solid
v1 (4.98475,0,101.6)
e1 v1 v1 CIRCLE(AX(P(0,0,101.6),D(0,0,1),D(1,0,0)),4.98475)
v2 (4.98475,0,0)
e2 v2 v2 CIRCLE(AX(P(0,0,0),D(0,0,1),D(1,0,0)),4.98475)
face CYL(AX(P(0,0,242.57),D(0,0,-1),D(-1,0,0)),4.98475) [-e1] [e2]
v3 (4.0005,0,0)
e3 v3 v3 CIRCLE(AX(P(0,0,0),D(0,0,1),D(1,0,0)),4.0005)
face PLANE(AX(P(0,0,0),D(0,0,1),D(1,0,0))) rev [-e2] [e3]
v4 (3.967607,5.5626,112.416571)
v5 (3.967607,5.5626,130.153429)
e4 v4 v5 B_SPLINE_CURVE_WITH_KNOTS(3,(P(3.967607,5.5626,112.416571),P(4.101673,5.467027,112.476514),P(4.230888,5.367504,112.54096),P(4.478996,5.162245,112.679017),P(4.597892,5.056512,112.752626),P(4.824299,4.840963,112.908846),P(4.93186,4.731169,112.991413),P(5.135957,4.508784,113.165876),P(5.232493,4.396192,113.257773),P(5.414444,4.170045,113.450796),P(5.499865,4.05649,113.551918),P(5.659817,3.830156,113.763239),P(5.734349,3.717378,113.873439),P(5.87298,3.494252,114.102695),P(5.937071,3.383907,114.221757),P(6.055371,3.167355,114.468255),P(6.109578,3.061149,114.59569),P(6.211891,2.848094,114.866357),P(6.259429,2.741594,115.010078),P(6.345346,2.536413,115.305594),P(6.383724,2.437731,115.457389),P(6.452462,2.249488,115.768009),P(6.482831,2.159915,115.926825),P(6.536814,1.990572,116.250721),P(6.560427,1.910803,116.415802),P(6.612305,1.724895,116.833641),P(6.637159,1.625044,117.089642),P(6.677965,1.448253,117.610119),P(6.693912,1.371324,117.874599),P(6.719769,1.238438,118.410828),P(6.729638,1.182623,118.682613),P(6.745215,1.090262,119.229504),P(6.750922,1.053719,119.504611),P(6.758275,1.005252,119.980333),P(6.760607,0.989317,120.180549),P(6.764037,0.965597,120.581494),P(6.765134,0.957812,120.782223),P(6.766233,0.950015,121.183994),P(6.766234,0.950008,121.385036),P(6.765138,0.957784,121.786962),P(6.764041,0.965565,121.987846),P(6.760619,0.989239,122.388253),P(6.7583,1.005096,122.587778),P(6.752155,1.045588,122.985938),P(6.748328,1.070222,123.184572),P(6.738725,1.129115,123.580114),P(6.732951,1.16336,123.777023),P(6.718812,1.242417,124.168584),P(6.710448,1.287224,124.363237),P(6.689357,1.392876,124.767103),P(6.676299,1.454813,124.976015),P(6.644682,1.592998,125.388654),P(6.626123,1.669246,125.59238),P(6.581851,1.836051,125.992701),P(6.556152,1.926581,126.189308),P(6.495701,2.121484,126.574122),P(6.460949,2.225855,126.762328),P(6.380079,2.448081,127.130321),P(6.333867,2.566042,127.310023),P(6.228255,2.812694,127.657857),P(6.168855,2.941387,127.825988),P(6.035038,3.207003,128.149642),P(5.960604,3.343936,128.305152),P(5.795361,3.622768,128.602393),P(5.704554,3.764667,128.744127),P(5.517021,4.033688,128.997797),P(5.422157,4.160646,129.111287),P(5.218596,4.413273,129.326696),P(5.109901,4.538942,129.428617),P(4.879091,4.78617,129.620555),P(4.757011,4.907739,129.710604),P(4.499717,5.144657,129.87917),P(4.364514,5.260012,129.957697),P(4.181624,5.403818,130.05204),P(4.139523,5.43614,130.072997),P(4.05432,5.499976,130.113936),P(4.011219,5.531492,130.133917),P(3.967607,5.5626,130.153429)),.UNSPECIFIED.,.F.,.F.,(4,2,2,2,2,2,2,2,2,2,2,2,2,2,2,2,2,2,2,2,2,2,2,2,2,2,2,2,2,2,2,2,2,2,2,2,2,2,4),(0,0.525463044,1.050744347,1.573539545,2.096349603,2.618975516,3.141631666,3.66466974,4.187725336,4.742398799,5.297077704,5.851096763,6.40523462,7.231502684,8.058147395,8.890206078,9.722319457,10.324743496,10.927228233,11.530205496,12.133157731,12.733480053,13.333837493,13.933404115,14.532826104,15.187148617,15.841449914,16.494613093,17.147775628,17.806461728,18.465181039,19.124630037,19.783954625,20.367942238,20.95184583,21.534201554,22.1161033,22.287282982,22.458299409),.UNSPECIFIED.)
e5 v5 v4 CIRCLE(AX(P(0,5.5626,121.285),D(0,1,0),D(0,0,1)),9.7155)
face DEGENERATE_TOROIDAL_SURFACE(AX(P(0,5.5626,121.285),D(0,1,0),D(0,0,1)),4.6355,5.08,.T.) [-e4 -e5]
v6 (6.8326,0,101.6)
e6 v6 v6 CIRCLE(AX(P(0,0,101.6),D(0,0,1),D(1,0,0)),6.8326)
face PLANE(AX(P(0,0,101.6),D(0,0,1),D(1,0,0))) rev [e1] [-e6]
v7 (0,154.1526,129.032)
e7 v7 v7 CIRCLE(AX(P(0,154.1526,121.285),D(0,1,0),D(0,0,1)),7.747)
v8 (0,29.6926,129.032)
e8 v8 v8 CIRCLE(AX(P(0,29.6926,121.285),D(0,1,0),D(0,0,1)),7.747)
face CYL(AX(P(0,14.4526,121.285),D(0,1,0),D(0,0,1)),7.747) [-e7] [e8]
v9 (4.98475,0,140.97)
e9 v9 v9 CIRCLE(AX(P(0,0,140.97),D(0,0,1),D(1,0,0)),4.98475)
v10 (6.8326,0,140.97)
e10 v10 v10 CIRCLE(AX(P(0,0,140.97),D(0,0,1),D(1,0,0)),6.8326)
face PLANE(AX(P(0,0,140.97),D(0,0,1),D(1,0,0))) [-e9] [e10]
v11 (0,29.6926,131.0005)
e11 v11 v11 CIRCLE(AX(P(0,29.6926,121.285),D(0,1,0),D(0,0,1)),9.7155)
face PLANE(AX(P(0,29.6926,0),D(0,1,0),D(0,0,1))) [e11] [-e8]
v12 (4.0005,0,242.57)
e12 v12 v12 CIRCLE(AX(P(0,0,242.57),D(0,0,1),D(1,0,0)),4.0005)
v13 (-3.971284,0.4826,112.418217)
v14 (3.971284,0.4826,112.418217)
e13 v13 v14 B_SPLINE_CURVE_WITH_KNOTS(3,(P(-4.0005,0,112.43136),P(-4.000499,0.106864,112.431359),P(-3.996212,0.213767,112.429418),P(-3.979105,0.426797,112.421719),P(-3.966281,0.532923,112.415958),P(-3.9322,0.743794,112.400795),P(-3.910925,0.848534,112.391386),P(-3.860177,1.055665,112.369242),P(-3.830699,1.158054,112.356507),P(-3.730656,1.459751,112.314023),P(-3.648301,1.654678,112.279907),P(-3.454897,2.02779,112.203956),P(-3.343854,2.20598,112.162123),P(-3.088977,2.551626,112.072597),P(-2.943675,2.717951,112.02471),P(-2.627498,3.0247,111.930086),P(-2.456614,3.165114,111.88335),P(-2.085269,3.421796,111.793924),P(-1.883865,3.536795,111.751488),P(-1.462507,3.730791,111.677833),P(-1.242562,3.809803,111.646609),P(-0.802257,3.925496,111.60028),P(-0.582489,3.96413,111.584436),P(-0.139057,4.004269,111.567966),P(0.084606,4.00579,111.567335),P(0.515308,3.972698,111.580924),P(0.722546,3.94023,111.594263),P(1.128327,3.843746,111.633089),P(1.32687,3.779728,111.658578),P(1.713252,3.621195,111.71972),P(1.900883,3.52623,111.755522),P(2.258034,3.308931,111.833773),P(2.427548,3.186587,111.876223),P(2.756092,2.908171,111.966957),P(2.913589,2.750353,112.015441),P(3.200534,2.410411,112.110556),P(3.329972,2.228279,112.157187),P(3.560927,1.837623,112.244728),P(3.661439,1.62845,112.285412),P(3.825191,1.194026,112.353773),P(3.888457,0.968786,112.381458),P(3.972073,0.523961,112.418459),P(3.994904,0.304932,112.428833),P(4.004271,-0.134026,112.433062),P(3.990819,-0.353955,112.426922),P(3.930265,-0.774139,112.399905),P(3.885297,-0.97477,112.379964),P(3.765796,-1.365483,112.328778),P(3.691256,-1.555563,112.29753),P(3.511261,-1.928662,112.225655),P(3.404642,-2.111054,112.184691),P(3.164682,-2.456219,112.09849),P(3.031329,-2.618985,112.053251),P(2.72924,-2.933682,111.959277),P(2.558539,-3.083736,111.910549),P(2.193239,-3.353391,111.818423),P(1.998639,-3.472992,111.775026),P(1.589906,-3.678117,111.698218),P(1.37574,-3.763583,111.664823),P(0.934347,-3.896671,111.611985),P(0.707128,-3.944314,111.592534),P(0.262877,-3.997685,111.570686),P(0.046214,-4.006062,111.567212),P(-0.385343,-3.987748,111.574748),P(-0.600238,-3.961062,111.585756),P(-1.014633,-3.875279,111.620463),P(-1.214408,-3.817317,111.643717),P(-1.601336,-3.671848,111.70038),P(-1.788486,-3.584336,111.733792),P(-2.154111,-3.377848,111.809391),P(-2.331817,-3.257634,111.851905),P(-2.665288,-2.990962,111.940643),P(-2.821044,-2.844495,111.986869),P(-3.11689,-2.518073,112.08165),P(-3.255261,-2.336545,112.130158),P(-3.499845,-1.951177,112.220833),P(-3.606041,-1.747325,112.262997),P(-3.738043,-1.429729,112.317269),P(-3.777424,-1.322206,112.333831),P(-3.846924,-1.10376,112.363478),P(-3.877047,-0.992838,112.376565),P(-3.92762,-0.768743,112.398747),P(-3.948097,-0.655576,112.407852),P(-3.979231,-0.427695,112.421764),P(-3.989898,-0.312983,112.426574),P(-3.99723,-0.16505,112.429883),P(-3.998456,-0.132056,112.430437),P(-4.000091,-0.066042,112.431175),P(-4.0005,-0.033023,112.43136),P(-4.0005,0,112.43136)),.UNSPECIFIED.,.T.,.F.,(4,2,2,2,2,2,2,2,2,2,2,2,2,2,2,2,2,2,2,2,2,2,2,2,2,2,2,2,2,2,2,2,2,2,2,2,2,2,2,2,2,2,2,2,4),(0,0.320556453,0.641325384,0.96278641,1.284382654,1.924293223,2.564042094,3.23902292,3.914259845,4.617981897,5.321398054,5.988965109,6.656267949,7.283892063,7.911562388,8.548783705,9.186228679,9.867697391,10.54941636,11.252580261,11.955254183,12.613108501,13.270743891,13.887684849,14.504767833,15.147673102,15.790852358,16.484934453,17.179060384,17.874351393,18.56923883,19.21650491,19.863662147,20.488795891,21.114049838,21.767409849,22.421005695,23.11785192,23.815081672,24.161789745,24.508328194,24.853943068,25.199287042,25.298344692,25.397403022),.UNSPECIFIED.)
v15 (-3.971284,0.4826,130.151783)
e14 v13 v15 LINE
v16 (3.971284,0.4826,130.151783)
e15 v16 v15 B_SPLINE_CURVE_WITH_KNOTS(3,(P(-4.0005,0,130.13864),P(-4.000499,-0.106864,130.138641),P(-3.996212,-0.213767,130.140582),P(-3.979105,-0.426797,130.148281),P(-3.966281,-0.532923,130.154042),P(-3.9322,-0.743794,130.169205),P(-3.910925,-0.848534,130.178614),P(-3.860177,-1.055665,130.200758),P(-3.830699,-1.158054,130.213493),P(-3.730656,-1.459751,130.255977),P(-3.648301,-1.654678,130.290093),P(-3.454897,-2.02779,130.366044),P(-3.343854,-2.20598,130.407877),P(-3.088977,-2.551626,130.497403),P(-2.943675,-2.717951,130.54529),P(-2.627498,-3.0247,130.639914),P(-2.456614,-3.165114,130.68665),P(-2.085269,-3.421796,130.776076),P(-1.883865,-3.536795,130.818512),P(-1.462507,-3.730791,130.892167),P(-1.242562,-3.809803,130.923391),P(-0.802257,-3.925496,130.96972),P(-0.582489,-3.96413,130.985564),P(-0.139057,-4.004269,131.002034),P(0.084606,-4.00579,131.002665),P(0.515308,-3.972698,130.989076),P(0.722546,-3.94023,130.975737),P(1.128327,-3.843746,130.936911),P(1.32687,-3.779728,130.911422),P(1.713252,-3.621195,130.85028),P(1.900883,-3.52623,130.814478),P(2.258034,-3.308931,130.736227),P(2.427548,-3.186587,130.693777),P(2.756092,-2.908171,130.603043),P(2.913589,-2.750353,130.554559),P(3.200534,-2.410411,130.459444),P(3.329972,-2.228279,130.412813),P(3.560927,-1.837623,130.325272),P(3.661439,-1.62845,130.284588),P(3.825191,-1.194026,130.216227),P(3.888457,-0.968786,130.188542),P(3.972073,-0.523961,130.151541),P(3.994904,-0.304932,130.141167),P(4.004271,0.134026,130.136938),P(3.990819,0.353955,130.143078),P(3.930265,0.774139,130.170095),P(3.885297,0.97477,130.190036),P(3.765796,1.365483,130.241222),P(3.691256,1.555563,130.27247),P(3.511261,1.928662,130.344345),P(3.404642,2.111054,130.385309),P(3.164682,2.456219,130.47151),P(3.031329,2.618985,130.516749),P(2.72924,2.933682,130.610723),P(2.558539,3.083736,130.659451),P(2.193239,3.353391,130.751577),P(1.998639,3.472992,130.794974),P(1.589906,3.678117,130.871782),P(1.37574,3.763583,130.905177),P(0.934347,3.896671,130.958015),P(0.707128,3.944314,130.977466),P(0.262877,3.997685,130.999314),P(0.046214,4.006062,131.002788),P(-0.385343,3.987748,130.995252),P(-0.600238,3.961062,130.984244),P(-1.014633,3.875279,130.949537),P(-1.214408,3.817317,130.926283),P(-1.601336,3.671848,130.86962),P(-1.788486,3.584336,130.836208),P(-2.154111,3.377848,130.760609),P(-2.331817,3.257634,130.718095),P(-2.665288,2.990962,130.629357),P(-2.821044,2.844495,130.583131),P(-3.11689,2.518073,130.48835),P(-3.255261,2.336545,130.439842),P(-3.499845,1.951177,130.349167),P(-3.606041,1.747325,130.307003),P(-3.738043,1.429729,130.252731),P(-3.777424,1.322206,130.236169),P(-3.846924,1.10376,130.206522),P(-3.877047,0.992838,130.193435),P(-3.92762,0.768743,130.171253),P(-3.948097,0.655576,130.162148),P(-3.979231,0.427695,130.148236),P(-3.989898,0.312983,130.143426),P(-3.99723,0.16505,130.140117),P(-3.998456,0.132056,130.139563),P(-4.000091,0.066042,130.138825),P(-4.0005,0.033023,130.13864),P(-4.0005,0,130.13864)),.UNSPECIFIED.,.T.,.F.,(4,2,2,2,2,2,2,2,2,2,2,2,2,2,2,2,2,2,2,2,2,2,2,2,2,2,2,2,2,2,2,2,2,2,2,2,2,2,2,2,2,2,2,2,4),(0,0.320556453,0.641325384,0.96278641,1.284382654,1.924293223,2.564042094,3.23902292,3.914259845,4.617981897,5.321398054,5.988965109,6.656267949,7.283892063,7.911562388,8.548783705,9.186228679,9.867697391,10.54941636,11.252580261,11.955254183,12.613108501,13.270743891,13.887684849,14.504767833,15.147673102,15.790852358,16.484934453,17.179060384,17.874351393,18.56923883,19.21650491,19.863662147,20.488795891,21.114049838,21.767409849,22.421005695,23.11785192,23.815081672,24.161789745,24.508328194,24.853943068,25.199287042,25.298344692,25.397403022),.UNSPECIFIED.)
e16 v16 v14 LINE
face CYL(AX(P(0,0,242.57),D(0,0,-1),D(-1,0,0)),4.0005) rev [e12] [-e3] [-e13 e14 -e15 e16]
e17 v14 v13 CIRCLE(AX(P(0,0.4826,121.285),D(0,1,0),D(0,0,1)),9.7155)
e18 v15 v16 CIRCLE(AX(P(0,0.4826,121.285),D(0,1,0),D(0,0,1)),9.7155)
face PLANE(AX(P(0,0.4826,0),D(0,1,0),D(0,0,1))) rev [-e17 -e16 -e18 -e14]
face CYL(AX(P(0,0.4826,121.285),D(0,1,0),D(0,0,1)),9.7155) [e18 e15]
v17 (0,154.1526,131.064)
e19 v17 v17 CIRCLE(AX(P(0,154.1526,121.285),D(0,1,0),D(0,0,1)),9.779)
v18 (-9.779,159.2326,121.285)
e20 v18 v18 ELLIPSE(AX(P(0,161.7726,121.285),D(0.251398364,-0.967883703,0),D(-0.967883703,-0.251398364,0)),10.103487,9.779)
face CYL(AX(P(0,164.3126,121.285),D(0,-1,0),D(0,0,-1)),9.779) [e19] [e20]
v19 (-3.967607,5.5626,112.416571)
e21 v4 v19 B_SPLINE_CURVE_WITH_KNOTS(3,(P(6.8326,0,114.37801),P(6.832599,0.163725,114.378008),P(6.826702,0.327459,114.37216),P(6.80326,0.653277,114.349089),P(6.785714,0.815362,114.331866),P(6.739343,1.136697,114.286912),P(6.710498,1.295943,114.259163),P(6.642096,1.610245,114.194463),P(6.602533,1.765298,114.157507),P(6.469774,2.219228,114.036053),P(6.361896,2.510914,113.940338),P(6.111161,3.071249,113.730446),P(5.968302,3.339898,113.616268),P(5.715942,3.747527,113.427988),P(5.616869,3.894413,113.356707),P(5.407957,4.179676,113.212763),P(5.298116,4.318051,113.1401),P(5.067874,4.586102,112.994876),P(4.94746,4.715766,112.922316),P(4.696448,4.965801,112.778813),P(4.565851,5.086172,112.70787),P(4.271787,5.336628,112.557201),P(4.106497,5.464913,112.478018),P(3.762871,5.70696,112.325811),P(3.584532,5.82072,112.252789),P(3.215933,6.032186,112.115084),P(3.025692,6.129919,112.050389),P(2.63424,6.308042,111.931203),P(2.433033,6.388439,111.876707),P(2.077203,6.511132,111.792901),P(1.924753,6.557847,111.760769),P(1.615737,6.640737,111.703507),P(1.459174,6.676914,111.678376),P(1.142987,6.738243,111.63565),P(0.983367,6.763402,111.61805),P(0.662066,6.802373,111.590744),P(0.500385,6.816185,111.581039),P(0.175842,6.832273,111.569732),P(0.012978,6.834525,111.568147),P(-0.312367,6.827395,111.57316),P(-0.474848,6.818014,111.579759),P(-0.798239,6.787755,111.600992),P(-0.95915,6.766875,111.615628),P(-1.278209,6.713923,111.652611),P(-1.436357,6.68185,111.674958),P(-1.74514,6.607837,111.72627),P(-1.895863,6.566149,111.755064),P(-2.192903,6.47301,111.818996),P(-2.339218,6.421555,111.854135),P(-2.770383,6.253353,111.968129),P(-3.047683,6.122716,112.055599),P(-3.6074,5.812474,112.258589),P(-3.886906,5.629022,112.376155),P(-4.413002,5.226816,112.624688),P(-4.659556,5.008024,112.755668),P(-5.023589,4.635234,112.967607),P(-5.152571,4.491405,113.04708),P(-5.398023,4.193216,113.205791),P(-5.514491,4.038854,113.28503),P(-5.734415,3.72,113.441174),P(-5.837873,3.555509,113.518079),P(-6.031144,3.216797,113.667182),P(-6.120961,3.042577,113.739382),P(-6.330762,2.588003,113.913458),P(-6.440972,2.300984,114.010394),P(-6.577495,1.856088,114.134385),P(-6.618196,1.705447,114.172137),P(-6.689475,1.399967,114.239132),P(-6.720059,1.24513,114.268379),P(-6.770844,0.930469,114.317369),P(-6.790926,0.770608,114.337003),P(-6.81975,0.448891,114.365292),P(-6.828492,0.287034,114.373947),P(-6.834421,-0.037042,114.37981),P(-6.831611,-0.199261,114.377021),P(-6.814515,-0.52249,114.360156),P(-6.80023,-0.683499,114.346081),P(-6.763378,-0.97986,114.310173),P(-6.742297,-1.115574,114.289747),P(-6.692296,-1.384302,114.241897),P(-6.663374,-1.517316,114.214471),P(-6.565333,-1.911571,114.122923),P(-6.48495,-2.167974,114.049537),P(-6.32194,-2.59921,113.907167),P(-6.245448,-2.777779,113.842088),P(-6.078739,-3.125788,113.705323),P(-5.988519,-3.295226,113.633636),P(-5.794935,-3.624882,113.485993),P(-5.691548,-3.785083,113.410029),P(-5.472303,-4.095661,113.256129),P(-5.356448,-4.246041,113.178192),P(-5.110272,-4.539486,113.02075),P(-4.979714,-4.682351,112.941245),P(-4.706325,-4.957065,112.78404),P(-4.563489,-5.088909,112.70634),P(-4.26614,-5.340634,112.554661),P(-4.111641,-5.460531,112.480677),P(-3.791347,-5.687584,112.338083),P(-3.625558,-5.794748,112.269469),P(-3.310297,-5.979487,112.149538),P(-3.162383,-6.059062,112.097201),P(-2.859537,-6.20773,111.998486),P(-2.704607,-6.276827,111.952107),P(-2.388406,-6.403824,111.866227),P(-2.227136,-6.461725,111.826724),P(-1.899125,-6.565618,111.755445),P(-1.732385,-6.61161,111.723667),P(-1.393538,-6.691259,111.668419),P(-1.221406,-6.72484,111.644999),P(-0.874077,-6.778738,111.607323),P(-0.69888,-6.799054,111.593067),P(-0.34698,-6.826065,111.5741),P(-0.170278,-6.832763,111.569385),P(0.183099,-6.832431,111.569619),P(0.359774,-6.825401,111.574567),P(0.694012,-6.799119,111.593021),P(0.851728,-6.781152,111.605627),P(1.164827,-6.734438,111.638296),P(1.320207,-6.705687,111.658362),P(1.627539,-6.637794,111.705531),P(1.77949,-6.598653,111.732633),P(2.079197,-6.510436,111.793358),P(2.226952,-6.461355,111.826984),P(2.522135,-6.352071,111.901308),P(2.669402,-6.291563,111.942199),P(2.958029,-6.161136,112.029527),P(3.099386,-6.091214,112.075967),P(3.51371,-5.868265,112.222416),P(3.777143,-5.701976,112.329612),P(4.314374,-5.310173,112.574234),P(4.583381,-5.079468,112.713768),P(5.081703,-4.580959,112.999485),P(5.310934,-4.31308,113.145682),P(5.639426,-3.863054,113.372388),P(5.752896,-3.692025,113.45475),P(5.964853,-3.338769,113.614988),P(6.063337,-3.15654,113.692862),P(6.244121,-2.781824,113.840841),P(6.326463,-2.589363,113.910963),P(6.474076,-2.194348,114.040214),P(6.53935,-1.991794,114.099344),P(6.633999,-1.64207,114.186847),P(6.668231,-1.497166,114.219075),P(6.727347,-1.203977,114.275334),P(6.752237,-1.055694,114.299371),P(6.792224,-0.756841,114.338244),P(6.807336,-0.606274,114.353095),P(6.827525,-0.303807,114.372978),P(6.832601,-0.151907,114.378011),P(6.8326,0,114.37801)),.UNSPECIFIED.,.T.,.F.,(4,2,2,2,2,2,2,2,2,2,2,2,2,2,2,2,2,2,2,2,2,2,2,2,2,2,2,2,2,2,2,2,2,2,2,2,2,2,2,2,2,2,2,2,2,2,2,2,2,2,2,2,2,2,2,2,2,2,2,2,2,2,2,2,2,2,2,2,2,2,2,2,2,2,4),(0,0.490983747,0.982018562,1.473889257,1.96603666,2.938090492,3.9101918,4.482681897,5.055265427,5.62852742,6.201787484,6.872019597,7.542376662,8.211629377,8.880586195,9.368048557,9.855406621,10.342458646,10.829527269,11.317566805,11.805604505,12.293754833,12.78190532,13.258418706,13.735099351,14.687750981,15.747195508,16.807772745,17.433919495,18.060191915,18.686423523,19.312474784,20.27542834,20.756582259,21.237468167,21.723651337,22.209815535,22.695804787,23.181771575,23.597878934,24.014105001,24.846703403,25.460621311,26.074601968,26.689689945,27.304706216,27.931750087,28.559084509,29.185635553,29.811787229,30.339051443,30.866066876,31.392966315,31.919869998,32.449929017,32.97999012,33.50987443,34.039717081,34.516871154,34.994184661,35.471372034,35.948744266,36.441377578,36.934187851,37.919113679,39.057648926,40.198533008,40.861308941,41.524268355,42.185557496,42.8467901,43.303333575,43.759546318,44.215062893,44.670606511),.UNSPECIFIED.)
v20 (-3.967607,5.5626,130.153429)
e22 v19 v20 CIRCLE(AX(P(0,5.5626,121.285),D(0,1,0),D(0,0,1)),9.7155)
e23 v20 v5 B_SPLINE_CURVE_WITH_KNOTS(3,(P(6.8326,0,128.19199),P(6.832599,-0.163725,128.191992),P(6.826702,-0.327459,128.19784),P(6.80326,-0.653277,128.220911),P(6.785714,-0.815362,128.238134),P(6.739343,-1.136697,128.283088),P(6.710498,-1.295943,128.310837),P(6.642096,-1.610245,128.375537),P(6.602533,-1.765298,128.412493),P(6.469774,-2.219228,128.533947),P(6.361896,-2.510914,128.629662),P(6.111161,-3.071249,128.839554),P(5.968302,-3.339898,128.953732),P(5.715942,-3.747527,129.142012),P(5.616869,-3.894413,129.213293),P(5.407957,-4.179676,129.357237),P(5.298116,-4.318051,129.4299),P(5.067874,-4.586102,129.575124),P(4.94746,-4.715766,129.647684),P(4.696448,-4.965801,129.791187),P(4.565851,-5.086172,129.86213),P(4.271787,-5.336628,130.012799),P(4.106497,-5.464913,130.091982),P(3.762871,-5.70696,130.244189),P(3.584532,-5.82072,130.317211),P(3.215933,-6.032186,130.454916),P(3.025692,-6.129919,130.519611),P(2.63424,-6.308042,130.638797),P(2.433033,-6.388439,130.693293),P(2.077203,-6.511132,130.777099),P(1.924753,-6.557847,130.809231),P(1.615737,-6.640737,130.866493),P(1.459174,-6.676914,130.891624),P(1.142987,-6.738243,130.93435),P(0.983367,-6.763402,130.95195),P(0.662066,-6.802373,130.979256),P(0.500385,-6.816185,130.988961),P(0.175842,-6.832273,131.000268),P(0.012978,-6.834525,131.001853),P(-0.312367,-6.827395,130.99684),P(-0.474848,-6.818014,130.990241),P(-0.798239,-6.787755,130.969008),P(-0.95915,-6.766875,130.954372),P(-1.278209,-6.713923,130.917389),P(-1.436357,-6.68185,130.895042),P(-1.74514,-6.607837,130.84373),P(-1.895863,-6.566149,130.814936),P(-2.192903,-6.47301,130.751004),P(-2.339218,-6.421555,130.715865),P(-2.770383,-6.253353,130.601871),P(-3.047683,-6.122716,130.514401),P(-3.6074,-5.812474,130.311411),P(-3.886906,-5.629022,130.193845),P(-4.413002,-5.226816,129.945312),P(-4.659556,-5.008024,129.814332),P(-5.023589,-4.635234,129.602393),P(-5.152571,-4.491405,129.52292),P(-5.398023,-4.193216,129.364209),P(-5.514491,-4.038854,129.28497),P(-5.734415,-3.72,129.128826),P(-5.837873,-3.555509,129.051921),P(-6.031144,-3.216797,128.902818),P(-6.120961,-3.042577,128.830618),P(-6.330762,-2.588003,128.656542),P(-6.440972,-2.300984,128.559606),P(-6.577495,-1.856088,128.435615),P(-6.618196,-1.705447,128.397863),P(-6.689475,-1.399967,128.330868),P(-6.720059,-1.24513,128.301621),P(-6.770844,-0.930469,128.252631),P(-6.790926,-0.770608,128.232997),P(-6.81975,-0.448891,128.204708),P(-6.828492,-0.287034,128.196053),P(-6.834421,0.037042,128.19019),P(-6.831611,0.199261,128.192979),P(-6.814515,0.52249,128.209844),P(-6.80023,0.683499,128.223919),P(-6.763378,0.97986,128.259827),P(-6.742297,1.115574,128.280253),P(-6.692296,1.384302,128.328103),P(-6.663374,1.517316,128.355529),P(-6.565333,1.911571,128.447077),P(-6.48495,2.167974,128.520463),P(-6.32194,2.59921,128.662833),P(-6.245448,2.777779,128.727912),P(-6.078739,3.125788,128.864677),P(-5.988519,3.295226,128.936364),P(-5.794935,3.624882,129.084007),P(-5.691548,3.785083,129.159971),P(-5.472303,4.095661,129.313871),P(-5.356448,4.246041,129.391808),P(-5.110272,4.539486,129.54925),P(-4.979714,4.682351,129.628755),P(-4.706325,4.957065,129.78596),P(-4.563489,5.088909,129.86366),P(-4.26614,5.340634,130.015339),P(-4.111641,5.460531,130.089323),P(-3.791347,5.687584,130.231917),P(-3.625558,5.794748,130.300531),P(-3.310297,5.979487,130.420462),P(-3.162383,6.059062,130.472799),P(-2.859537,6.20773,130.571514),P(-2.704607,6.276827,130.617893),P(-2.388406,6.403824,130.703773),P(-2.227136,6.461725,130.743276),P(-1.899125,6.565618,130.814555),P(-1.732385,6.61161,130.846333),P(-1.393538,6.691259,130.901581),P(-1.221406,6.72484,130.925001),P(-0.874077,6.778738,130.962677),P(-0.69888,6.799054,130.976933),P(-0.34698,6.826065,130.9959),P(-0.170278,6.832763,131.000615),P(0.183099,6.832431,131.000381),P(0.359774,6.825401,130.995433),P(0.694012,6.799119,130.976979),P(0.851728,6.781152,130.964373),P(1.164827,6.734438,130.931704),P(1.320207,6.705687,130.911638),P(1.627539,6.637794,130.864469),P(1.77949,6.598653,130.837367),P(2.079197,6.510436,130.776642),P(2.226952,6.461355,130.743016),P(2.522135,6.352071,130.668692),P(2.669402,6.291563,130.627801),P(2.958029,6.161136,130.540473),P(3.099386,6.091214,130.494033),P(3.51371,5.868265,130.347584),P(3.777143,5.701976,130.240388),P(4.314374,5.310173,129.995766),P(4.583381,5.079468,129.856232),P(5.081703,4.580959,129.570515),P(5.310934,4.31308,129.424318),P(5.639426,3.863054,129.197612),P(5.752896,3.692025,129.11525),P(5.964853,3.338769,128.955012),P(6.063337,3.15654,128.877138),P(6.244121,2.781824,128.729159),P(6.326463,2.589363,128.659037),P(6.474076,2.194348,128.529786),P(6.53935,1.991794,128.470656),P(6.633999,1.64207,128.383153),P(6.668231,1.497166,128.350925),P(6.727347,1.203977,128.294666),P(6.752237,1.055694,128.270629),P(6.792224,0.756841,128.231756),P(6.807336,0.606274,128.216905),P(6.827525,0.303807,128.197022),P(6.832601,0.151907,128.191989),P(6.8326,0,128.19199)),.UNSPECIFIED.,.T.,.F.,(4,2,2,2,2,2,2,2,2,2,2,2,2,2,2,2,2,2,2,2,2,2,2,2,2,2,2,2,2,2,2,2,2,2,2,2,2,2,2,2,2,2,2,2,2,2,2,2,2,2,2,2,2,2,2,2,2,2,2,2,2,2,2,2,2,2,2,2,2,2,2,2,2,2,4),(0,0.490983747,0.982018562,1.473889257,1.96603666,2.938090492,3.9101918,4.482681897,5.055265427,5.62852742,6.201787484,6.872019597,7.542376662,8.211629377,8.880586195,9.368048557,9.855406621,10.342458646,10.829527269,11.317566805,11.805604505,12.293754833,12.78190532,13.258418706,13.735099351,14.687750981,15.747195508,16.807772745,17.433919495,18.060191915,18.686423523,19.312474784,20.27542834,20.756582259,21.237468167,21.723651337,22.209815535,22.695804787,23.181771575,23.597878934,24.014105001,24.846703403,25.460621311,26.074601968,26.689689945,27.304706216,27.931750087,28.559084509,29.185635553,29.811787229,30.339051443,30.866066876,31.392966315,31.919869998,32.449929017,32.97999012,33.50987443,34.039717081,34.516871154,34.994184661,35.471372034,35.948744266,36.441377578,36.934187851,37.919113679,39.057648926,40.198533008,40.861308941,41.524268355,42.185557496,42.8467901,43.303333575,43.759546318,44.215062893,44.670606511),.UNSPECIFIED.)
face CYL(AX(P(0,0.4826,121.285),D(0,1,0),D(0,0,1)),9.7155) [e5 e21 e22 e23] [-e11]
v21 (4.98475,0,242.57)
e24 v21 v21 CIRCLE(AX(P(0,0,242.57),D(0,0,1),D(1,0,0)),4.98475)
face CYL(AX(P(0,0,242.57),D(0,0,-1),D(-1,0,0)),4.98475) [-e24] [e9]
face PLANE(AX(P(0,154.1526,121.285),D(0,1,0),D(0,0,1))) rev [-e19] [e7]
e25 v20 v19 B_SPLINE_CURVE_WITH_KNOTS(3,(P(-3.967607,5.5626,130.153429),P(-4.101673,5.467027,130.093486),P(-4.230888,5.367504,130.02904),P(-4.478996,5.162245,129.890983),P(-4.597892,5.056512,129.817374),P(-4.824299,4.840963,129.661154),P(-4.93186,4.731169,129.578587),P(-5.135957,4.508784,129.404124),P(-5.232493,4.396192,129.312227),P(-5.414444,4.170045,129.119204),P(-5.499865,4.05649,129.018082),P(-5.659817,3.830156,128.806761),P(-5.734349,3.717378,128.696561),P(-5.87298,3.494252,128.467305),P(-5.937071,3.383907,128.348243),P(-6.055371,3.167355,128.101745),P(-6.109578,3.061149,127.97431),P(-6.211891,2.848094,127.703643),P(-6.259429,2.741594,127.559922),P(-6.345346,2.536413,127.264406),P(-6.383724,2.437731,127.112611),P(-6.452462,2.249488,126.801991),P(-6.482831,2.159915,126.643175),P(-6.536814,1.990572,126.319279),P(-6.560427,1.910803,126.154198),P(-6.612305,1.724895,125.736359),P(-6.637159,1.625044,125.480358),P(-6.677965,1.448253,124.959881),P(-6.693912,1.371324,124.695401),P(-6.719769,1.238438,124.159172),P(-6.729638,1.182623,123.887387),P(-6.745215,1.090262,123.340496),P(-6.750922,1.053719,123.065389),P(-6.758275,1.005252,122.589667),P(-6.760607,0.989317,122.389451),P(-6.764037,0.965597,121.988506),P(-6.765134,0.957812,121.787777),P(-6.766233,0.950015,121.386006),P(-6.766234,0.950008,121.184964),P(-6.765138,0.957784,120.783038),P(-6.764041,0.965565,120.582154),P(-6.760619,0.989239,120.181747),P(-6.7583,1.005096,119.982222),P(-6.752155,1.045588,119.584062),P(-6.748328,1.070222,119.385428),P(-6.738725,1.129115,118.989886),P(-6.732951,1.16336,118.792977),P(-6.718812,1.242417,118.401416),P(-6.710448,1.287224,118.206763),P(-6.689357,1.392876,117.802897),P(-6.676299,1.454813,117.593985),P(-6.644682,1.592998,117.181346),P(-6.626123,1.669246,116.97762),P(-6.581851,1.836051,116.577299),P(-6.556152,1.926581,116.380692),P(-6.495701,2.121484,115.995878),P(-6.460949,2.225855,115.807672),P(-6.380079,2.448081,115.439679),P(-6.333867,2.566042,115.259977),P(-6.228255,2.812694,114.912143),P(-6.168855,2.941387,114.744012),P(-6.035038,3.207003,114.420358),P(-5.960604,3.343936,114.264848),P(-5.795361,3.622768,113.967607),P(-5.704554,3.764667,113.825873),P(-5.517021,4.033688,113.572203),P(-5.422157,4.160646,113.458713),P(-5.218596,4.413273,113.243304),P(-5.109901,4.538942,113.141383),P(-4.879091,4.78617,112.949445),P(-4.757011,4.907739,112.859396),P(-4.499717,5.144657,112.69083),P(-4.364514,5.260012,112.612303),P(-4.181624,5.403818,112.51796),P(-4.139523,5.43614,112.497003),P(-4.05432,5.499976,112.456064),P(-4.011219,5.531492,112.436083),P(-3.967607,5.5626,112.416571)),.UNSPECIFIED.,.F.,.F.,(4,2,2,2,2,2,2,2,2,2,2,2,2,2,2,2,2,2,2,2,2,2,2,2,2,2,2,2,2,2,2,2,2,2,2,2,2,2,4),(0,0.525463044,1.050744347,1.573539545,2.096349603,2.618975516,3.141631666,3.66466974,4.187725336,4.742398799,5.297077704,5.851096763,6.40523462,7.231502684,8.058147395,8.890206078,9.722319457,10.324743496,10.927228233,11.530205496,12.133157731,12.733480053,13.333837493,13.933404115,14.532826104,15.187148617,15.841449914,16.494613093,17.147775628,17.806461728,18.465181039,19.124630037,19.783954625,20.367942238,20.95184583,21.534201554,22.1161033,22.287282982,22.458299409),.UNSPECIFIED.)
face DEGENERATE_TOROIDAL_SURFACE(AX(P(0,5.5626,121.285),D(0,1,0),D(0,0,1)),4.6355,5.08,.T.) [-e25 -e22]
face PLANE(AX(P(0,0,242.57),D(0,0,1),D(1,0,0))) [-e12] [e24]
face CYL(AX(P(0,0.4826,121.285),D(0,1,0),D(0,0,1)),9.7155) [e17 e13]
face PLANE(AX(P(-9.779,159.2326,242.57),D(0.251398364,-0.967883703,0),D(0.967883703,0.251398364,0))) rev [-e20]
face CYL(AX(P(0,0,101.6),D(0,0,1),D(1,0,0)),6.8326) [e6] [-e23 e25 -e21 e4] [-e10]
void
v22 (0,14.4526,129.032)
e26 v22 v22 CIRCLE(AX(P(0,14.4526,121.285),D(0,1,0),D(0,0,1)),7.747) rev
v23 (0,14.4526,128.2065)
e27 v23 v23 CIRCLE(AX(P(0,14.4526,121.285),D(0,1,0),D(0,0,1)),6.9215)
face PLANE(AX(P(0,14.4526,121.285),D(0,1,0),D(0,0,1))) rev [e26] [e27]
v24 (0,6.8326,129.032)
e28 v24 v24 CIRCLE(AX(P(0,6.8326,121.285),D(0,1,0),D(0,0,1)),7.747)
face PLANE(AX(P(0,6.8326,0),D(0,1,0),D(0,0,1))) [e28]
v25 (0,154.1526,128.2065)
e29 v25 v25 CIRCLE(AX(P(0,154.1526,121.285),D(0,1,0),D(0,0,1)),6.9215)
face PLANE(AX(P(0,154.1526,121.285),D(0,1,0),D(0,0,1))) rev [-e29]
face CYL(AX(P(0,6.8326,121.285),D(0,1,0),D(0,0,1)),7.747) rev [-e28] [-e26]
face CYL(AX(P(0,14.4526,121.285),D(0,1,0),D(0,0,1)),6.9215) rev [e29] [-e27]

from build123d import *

# Parameters (mm, degrees)
SKETCH1_R                = 4.98475
SKETCH1_R_2              = 4.0005
BOSS_EXTRUDE1_DEPTH      = 242.57
BOSS_EXTRUDE2_START      = -39.37
SKETCH2_R                = 6.8326
SKETCH2_R_2              = 4.98475
BOSS_EXTRUDE2_DEPTH      = 39.37
BOSS_EXTRUDE3_DEPTH      = 22.86
BOSS_EXTRUDE3_DEPTH_BACK = 6.35
SKETCH4_R                = 9.7155
SKETCH5_R                = 7.747
CUT_EXTRUDE1_DEPTH       = 22.86
FILLET1_R                = 5.08
BOSS_EXTRUDE5_DEPTH      = 124.46
BOSS_EXTRUDE5_DEPTH_BACK = 15.24
SKETCH6_R                = 7.747
SKETCH6_R_2              = 6.9215
SKETCH7_R                = 9.779
BOSS_EXTRUDE6_DEPTH      = 10.16
CUT_EXTRUDE2_DEPTH       = 217.718250934


with BuildPart() as part:
    # Sketch1 → Boss-Extrude1 (new body)
    with BuildSketch(Plane.XY):
        Circle(SKETCH1_R)
        Circle(SKETCH1_R_2, mode=Mode.SUBTRACT)
    extrude(amount=BOSS_EXTRUDE1_DEPTH)

    # Sketch2 → Boss-Extrude2 (add)
    with BuildSketch(Plane.XY.offset(140.97).offset(BOSS_EXTRUDE2_START)):
        Circle(SKETCH2_R)
        Circle(SKETCH2_R_2, mode=Mode.SUBTRACT)
    extrude(amount=BOSS_EXTRUDE2_DEPTH)

    # Sketch4 → Boss-Extrude3 (add, two sides: drawn at the far end of the back side and taken through both)
    with BuildSketch(Plane(origin=(0, 6.8326, 0), x_dir=(1, 0, 0), z_dir=(0, 1, 0)).offset(-BOSS_EXTRUDE3_DEPTH_BACK)):
        with Locations(Location((0, -121.285, 0), (0, 0, 270))):
            Circle(SKETCH4_R)
    extrude(amount=BOSS_EXTRUDE3_DEPTH + BOSS_EXTRUDE3_DEPTH_BACK)

    # Sketch5 → Cut-Extrude1 (cut)
    with BuildSketch(Plane(origin=(0, 29.6926, 0), x_dir=(1, 0, 0), z_dir=(0, 1, 0))):
        with Locations(Location((0, -121.285, 0), (0, 0, 270))):
            Circle(SKETCH5_R)
    extrude(amount=-CUT_EXTRUDE1_DEPTH, mode=Mode.SUBTRACT)

    # Fillet1
    # the kernel refuses this fillet: 5.08 mm, written as the material it adds along each edge
    # the kernel refuses this fillet: 5.08 mm, written as the material it takes off along each edge
    with BuildSketch(Plane(origin=(0, 0.4826, 121.285), x_dir=(-0.9876010870599544, 0, -0.1569843713176455), z_dir=(0.1569843713176455, 0, -0.9876010870599544))) as fillet1_2_piece_1_section:
        with BuildLine():
            CenterArc((9.7155 - FILLET1_R, FILLET1_R), FILLET1_R, 270, 90)
            Line((9.7155 - FILLET1_R, 0), (9.7155, 0))
            Line((9.7155, 0), (9.7155, FILLET1_R))
        make_face()
    fillet1_2_piece_1 = revolve(axis=Axis((0, 0.4826, 121.285), (0, 1, 0)), revolution_arc=198.063802919, mode=Mode.PRIVATE)
    fillet1_2_piece_1 = fillet1_2_piece_1 - Plane(origin=(0, 0, 123.780869726), x_dir=(1, 0, 0), z_dir=(0, 0, -1)) * Cylinder(6.8326, 39, mode=Mode.PRIVATE)
    add(fillet1_2_piece_1, mode=Mode.SUBTRACT)
    with BuildSketch(Plane(origin=(0, 0.4826, 121.285), x_dir=(0.9876010870599545, 0, 0.15698437131764403), z_dir=(-0.15698437131764403, 0, 0.9876010870599545))) as fillet1_2_piece_2_section:
        with BuildLine():
            CenterArc((9.7155 - FILLET1_R, FILLET1_R), FILLET1_R, 270, 90)
            Line((9.7155, FILLET1_R), (9.7155, 0))
            Line((9.7155, 0), (9.7155 - FILLET1_R, 0))
        make_face()
    fillet1_2_piece_2 = revolve(axis=Axis((0, 0.4826, 121.285), (0, 1, 0)), revolution_arc=198.063802919, mode=Mode.PRIVATE)
    fillet1_2_piece_2 = fillet1_2_piece_2 - Plane(origin=(0, 0, 118.789130045), x_dir=(1, 0, 0), z_dir=(0, 0, -1)) * Cylinder(6.8326, 39, mode=Mode.PRIVATE)
    add(fillet1_2_piece_2, mode=Mode.SUBTRACT)
    with BuildSketch(Plane(origin=(0, 0.4826, 121.285), x_dir=(-0.505713651379917, 0, 0.8627013984038694), z_dir=(-0.8627013984038694, 0, -0.505713651379917))) as fillet1_2_piece_3_section:
        with BuildLine():
            CenterArc((9.7155 - FILLET1_R, FILLET1_R), FILLET1_R, 270, 90)
            Line((9.7155 - FILLET1_R, 0), (9.7155, 0))
            Line((9.7155, 0), (9.7155, FILLET1_R))
        make_face()
    fillet1_2_piece_3 = revolve(axis=Axis((0, 0.4826, 121.285), (0, 1, 0)), revolution_arc=240.757475194, mode=Mode.PRIVATE)
    fillet1_2_piece_3 = fillet1_2_piece_3 - Plane(origin=(0, 0, 129.754845305), x_dir=(1, 0, 0), z_dir=(0, 0, -1)) * Cylinder(6.8326, 39, mode=Mode.PRIVATE)
    add(fillet1_2_piece_3, mode=Mode.SUBTRACT)
    with BuildSketch(Plane(origin=(0, 0.4826, 121.285), x_dir=(0.5057136513799171, 0, -0.8627013984038694), z_dir=(0.8627013984038694, 0, 0.5057136513799171))) as fillet1_2_piece_4_section:
        with BuildLine():
            CenterArc((9.7155 - FILLET1_R, FILLET1_R), FILLET1_R, 270, 90)
            Line((9.7155 - FILLET1_R, 0), (9.7155, 0))
            Line((9.7155, 0), (9.7155, FILLET1_R))
        make_face()
    fillet1_2_piece_4 = revolve(axis=Axis((0, 0.4826, 121.285), (0, 1, 0)), revolution_arc=240.757475194, mode=Mode.PRIVATE)
    fillet1_2_piece_4 = fillet1_2_piece_4 - Plane(origin=(0, 0, 112.815156077), x_dir=(1, 0, 0), z_dir=(0, 0, -1)) * Cylinder(6.8326, 39, mode=Mode.PRIVATE)
    add(fillet1_2_piece_4, mode=Mode.SUBTRACT)

    # Sketch6 → Boss-Extrude5 (add, two sides: drawn at the far end of the back side and taken through both)
    with BuildSketch(Plane(origin=(0, 29.6926, 0), x_dir=(1, 0, 0), z_dir=(0, 1, 0)).offset(-BOSS_EXTRUDE5_DEPTH_BACK)):
        with Locations(Location((0, -121.285, 0), (0, 0, 270))):
            Circle(SKETCH6_R)
        with Locations(Location((0, -121.285, 0), (0, 0, 270))):
            Circle(SKETCH6_R_2, mode=Mode.SUBTRACT)
    extrude(amount=BOSS_EXTRUDE5_DEPTH + BOSS_EXTRUDE5_DEPTH_BACK)

    # Sketch7 → Boss-Extrude6 (add)
    with BuildSketch(Plane(origin=(0, 154.1526, 0), x_dir=(1, 0, 0), z_dir=(0, 1, 0))):
        with Locations(Location((0, -121.285, 0), (0, 0, 270))):
            Circle(SKETCH7_R)
    extrude(amount=BOSS_EXTRUDE6_DEPTH)

    # Sketch8 → Cut-Extrude2 (cut, through all)
    with BuildSketch(Plane(origin=(0, 0, 101.6), x_dir=(-1, 0, 0), z_dir=(0, 0, -1))):
        Polygon((9.779, 164.3126), (-9.779, 164.3126), (9.779, 159.2326), align=None)
    extrude(amount=-CUT_EXTRUDE2_DEPTH, mode=Mode.SUBTRACT)


solid = part.part
